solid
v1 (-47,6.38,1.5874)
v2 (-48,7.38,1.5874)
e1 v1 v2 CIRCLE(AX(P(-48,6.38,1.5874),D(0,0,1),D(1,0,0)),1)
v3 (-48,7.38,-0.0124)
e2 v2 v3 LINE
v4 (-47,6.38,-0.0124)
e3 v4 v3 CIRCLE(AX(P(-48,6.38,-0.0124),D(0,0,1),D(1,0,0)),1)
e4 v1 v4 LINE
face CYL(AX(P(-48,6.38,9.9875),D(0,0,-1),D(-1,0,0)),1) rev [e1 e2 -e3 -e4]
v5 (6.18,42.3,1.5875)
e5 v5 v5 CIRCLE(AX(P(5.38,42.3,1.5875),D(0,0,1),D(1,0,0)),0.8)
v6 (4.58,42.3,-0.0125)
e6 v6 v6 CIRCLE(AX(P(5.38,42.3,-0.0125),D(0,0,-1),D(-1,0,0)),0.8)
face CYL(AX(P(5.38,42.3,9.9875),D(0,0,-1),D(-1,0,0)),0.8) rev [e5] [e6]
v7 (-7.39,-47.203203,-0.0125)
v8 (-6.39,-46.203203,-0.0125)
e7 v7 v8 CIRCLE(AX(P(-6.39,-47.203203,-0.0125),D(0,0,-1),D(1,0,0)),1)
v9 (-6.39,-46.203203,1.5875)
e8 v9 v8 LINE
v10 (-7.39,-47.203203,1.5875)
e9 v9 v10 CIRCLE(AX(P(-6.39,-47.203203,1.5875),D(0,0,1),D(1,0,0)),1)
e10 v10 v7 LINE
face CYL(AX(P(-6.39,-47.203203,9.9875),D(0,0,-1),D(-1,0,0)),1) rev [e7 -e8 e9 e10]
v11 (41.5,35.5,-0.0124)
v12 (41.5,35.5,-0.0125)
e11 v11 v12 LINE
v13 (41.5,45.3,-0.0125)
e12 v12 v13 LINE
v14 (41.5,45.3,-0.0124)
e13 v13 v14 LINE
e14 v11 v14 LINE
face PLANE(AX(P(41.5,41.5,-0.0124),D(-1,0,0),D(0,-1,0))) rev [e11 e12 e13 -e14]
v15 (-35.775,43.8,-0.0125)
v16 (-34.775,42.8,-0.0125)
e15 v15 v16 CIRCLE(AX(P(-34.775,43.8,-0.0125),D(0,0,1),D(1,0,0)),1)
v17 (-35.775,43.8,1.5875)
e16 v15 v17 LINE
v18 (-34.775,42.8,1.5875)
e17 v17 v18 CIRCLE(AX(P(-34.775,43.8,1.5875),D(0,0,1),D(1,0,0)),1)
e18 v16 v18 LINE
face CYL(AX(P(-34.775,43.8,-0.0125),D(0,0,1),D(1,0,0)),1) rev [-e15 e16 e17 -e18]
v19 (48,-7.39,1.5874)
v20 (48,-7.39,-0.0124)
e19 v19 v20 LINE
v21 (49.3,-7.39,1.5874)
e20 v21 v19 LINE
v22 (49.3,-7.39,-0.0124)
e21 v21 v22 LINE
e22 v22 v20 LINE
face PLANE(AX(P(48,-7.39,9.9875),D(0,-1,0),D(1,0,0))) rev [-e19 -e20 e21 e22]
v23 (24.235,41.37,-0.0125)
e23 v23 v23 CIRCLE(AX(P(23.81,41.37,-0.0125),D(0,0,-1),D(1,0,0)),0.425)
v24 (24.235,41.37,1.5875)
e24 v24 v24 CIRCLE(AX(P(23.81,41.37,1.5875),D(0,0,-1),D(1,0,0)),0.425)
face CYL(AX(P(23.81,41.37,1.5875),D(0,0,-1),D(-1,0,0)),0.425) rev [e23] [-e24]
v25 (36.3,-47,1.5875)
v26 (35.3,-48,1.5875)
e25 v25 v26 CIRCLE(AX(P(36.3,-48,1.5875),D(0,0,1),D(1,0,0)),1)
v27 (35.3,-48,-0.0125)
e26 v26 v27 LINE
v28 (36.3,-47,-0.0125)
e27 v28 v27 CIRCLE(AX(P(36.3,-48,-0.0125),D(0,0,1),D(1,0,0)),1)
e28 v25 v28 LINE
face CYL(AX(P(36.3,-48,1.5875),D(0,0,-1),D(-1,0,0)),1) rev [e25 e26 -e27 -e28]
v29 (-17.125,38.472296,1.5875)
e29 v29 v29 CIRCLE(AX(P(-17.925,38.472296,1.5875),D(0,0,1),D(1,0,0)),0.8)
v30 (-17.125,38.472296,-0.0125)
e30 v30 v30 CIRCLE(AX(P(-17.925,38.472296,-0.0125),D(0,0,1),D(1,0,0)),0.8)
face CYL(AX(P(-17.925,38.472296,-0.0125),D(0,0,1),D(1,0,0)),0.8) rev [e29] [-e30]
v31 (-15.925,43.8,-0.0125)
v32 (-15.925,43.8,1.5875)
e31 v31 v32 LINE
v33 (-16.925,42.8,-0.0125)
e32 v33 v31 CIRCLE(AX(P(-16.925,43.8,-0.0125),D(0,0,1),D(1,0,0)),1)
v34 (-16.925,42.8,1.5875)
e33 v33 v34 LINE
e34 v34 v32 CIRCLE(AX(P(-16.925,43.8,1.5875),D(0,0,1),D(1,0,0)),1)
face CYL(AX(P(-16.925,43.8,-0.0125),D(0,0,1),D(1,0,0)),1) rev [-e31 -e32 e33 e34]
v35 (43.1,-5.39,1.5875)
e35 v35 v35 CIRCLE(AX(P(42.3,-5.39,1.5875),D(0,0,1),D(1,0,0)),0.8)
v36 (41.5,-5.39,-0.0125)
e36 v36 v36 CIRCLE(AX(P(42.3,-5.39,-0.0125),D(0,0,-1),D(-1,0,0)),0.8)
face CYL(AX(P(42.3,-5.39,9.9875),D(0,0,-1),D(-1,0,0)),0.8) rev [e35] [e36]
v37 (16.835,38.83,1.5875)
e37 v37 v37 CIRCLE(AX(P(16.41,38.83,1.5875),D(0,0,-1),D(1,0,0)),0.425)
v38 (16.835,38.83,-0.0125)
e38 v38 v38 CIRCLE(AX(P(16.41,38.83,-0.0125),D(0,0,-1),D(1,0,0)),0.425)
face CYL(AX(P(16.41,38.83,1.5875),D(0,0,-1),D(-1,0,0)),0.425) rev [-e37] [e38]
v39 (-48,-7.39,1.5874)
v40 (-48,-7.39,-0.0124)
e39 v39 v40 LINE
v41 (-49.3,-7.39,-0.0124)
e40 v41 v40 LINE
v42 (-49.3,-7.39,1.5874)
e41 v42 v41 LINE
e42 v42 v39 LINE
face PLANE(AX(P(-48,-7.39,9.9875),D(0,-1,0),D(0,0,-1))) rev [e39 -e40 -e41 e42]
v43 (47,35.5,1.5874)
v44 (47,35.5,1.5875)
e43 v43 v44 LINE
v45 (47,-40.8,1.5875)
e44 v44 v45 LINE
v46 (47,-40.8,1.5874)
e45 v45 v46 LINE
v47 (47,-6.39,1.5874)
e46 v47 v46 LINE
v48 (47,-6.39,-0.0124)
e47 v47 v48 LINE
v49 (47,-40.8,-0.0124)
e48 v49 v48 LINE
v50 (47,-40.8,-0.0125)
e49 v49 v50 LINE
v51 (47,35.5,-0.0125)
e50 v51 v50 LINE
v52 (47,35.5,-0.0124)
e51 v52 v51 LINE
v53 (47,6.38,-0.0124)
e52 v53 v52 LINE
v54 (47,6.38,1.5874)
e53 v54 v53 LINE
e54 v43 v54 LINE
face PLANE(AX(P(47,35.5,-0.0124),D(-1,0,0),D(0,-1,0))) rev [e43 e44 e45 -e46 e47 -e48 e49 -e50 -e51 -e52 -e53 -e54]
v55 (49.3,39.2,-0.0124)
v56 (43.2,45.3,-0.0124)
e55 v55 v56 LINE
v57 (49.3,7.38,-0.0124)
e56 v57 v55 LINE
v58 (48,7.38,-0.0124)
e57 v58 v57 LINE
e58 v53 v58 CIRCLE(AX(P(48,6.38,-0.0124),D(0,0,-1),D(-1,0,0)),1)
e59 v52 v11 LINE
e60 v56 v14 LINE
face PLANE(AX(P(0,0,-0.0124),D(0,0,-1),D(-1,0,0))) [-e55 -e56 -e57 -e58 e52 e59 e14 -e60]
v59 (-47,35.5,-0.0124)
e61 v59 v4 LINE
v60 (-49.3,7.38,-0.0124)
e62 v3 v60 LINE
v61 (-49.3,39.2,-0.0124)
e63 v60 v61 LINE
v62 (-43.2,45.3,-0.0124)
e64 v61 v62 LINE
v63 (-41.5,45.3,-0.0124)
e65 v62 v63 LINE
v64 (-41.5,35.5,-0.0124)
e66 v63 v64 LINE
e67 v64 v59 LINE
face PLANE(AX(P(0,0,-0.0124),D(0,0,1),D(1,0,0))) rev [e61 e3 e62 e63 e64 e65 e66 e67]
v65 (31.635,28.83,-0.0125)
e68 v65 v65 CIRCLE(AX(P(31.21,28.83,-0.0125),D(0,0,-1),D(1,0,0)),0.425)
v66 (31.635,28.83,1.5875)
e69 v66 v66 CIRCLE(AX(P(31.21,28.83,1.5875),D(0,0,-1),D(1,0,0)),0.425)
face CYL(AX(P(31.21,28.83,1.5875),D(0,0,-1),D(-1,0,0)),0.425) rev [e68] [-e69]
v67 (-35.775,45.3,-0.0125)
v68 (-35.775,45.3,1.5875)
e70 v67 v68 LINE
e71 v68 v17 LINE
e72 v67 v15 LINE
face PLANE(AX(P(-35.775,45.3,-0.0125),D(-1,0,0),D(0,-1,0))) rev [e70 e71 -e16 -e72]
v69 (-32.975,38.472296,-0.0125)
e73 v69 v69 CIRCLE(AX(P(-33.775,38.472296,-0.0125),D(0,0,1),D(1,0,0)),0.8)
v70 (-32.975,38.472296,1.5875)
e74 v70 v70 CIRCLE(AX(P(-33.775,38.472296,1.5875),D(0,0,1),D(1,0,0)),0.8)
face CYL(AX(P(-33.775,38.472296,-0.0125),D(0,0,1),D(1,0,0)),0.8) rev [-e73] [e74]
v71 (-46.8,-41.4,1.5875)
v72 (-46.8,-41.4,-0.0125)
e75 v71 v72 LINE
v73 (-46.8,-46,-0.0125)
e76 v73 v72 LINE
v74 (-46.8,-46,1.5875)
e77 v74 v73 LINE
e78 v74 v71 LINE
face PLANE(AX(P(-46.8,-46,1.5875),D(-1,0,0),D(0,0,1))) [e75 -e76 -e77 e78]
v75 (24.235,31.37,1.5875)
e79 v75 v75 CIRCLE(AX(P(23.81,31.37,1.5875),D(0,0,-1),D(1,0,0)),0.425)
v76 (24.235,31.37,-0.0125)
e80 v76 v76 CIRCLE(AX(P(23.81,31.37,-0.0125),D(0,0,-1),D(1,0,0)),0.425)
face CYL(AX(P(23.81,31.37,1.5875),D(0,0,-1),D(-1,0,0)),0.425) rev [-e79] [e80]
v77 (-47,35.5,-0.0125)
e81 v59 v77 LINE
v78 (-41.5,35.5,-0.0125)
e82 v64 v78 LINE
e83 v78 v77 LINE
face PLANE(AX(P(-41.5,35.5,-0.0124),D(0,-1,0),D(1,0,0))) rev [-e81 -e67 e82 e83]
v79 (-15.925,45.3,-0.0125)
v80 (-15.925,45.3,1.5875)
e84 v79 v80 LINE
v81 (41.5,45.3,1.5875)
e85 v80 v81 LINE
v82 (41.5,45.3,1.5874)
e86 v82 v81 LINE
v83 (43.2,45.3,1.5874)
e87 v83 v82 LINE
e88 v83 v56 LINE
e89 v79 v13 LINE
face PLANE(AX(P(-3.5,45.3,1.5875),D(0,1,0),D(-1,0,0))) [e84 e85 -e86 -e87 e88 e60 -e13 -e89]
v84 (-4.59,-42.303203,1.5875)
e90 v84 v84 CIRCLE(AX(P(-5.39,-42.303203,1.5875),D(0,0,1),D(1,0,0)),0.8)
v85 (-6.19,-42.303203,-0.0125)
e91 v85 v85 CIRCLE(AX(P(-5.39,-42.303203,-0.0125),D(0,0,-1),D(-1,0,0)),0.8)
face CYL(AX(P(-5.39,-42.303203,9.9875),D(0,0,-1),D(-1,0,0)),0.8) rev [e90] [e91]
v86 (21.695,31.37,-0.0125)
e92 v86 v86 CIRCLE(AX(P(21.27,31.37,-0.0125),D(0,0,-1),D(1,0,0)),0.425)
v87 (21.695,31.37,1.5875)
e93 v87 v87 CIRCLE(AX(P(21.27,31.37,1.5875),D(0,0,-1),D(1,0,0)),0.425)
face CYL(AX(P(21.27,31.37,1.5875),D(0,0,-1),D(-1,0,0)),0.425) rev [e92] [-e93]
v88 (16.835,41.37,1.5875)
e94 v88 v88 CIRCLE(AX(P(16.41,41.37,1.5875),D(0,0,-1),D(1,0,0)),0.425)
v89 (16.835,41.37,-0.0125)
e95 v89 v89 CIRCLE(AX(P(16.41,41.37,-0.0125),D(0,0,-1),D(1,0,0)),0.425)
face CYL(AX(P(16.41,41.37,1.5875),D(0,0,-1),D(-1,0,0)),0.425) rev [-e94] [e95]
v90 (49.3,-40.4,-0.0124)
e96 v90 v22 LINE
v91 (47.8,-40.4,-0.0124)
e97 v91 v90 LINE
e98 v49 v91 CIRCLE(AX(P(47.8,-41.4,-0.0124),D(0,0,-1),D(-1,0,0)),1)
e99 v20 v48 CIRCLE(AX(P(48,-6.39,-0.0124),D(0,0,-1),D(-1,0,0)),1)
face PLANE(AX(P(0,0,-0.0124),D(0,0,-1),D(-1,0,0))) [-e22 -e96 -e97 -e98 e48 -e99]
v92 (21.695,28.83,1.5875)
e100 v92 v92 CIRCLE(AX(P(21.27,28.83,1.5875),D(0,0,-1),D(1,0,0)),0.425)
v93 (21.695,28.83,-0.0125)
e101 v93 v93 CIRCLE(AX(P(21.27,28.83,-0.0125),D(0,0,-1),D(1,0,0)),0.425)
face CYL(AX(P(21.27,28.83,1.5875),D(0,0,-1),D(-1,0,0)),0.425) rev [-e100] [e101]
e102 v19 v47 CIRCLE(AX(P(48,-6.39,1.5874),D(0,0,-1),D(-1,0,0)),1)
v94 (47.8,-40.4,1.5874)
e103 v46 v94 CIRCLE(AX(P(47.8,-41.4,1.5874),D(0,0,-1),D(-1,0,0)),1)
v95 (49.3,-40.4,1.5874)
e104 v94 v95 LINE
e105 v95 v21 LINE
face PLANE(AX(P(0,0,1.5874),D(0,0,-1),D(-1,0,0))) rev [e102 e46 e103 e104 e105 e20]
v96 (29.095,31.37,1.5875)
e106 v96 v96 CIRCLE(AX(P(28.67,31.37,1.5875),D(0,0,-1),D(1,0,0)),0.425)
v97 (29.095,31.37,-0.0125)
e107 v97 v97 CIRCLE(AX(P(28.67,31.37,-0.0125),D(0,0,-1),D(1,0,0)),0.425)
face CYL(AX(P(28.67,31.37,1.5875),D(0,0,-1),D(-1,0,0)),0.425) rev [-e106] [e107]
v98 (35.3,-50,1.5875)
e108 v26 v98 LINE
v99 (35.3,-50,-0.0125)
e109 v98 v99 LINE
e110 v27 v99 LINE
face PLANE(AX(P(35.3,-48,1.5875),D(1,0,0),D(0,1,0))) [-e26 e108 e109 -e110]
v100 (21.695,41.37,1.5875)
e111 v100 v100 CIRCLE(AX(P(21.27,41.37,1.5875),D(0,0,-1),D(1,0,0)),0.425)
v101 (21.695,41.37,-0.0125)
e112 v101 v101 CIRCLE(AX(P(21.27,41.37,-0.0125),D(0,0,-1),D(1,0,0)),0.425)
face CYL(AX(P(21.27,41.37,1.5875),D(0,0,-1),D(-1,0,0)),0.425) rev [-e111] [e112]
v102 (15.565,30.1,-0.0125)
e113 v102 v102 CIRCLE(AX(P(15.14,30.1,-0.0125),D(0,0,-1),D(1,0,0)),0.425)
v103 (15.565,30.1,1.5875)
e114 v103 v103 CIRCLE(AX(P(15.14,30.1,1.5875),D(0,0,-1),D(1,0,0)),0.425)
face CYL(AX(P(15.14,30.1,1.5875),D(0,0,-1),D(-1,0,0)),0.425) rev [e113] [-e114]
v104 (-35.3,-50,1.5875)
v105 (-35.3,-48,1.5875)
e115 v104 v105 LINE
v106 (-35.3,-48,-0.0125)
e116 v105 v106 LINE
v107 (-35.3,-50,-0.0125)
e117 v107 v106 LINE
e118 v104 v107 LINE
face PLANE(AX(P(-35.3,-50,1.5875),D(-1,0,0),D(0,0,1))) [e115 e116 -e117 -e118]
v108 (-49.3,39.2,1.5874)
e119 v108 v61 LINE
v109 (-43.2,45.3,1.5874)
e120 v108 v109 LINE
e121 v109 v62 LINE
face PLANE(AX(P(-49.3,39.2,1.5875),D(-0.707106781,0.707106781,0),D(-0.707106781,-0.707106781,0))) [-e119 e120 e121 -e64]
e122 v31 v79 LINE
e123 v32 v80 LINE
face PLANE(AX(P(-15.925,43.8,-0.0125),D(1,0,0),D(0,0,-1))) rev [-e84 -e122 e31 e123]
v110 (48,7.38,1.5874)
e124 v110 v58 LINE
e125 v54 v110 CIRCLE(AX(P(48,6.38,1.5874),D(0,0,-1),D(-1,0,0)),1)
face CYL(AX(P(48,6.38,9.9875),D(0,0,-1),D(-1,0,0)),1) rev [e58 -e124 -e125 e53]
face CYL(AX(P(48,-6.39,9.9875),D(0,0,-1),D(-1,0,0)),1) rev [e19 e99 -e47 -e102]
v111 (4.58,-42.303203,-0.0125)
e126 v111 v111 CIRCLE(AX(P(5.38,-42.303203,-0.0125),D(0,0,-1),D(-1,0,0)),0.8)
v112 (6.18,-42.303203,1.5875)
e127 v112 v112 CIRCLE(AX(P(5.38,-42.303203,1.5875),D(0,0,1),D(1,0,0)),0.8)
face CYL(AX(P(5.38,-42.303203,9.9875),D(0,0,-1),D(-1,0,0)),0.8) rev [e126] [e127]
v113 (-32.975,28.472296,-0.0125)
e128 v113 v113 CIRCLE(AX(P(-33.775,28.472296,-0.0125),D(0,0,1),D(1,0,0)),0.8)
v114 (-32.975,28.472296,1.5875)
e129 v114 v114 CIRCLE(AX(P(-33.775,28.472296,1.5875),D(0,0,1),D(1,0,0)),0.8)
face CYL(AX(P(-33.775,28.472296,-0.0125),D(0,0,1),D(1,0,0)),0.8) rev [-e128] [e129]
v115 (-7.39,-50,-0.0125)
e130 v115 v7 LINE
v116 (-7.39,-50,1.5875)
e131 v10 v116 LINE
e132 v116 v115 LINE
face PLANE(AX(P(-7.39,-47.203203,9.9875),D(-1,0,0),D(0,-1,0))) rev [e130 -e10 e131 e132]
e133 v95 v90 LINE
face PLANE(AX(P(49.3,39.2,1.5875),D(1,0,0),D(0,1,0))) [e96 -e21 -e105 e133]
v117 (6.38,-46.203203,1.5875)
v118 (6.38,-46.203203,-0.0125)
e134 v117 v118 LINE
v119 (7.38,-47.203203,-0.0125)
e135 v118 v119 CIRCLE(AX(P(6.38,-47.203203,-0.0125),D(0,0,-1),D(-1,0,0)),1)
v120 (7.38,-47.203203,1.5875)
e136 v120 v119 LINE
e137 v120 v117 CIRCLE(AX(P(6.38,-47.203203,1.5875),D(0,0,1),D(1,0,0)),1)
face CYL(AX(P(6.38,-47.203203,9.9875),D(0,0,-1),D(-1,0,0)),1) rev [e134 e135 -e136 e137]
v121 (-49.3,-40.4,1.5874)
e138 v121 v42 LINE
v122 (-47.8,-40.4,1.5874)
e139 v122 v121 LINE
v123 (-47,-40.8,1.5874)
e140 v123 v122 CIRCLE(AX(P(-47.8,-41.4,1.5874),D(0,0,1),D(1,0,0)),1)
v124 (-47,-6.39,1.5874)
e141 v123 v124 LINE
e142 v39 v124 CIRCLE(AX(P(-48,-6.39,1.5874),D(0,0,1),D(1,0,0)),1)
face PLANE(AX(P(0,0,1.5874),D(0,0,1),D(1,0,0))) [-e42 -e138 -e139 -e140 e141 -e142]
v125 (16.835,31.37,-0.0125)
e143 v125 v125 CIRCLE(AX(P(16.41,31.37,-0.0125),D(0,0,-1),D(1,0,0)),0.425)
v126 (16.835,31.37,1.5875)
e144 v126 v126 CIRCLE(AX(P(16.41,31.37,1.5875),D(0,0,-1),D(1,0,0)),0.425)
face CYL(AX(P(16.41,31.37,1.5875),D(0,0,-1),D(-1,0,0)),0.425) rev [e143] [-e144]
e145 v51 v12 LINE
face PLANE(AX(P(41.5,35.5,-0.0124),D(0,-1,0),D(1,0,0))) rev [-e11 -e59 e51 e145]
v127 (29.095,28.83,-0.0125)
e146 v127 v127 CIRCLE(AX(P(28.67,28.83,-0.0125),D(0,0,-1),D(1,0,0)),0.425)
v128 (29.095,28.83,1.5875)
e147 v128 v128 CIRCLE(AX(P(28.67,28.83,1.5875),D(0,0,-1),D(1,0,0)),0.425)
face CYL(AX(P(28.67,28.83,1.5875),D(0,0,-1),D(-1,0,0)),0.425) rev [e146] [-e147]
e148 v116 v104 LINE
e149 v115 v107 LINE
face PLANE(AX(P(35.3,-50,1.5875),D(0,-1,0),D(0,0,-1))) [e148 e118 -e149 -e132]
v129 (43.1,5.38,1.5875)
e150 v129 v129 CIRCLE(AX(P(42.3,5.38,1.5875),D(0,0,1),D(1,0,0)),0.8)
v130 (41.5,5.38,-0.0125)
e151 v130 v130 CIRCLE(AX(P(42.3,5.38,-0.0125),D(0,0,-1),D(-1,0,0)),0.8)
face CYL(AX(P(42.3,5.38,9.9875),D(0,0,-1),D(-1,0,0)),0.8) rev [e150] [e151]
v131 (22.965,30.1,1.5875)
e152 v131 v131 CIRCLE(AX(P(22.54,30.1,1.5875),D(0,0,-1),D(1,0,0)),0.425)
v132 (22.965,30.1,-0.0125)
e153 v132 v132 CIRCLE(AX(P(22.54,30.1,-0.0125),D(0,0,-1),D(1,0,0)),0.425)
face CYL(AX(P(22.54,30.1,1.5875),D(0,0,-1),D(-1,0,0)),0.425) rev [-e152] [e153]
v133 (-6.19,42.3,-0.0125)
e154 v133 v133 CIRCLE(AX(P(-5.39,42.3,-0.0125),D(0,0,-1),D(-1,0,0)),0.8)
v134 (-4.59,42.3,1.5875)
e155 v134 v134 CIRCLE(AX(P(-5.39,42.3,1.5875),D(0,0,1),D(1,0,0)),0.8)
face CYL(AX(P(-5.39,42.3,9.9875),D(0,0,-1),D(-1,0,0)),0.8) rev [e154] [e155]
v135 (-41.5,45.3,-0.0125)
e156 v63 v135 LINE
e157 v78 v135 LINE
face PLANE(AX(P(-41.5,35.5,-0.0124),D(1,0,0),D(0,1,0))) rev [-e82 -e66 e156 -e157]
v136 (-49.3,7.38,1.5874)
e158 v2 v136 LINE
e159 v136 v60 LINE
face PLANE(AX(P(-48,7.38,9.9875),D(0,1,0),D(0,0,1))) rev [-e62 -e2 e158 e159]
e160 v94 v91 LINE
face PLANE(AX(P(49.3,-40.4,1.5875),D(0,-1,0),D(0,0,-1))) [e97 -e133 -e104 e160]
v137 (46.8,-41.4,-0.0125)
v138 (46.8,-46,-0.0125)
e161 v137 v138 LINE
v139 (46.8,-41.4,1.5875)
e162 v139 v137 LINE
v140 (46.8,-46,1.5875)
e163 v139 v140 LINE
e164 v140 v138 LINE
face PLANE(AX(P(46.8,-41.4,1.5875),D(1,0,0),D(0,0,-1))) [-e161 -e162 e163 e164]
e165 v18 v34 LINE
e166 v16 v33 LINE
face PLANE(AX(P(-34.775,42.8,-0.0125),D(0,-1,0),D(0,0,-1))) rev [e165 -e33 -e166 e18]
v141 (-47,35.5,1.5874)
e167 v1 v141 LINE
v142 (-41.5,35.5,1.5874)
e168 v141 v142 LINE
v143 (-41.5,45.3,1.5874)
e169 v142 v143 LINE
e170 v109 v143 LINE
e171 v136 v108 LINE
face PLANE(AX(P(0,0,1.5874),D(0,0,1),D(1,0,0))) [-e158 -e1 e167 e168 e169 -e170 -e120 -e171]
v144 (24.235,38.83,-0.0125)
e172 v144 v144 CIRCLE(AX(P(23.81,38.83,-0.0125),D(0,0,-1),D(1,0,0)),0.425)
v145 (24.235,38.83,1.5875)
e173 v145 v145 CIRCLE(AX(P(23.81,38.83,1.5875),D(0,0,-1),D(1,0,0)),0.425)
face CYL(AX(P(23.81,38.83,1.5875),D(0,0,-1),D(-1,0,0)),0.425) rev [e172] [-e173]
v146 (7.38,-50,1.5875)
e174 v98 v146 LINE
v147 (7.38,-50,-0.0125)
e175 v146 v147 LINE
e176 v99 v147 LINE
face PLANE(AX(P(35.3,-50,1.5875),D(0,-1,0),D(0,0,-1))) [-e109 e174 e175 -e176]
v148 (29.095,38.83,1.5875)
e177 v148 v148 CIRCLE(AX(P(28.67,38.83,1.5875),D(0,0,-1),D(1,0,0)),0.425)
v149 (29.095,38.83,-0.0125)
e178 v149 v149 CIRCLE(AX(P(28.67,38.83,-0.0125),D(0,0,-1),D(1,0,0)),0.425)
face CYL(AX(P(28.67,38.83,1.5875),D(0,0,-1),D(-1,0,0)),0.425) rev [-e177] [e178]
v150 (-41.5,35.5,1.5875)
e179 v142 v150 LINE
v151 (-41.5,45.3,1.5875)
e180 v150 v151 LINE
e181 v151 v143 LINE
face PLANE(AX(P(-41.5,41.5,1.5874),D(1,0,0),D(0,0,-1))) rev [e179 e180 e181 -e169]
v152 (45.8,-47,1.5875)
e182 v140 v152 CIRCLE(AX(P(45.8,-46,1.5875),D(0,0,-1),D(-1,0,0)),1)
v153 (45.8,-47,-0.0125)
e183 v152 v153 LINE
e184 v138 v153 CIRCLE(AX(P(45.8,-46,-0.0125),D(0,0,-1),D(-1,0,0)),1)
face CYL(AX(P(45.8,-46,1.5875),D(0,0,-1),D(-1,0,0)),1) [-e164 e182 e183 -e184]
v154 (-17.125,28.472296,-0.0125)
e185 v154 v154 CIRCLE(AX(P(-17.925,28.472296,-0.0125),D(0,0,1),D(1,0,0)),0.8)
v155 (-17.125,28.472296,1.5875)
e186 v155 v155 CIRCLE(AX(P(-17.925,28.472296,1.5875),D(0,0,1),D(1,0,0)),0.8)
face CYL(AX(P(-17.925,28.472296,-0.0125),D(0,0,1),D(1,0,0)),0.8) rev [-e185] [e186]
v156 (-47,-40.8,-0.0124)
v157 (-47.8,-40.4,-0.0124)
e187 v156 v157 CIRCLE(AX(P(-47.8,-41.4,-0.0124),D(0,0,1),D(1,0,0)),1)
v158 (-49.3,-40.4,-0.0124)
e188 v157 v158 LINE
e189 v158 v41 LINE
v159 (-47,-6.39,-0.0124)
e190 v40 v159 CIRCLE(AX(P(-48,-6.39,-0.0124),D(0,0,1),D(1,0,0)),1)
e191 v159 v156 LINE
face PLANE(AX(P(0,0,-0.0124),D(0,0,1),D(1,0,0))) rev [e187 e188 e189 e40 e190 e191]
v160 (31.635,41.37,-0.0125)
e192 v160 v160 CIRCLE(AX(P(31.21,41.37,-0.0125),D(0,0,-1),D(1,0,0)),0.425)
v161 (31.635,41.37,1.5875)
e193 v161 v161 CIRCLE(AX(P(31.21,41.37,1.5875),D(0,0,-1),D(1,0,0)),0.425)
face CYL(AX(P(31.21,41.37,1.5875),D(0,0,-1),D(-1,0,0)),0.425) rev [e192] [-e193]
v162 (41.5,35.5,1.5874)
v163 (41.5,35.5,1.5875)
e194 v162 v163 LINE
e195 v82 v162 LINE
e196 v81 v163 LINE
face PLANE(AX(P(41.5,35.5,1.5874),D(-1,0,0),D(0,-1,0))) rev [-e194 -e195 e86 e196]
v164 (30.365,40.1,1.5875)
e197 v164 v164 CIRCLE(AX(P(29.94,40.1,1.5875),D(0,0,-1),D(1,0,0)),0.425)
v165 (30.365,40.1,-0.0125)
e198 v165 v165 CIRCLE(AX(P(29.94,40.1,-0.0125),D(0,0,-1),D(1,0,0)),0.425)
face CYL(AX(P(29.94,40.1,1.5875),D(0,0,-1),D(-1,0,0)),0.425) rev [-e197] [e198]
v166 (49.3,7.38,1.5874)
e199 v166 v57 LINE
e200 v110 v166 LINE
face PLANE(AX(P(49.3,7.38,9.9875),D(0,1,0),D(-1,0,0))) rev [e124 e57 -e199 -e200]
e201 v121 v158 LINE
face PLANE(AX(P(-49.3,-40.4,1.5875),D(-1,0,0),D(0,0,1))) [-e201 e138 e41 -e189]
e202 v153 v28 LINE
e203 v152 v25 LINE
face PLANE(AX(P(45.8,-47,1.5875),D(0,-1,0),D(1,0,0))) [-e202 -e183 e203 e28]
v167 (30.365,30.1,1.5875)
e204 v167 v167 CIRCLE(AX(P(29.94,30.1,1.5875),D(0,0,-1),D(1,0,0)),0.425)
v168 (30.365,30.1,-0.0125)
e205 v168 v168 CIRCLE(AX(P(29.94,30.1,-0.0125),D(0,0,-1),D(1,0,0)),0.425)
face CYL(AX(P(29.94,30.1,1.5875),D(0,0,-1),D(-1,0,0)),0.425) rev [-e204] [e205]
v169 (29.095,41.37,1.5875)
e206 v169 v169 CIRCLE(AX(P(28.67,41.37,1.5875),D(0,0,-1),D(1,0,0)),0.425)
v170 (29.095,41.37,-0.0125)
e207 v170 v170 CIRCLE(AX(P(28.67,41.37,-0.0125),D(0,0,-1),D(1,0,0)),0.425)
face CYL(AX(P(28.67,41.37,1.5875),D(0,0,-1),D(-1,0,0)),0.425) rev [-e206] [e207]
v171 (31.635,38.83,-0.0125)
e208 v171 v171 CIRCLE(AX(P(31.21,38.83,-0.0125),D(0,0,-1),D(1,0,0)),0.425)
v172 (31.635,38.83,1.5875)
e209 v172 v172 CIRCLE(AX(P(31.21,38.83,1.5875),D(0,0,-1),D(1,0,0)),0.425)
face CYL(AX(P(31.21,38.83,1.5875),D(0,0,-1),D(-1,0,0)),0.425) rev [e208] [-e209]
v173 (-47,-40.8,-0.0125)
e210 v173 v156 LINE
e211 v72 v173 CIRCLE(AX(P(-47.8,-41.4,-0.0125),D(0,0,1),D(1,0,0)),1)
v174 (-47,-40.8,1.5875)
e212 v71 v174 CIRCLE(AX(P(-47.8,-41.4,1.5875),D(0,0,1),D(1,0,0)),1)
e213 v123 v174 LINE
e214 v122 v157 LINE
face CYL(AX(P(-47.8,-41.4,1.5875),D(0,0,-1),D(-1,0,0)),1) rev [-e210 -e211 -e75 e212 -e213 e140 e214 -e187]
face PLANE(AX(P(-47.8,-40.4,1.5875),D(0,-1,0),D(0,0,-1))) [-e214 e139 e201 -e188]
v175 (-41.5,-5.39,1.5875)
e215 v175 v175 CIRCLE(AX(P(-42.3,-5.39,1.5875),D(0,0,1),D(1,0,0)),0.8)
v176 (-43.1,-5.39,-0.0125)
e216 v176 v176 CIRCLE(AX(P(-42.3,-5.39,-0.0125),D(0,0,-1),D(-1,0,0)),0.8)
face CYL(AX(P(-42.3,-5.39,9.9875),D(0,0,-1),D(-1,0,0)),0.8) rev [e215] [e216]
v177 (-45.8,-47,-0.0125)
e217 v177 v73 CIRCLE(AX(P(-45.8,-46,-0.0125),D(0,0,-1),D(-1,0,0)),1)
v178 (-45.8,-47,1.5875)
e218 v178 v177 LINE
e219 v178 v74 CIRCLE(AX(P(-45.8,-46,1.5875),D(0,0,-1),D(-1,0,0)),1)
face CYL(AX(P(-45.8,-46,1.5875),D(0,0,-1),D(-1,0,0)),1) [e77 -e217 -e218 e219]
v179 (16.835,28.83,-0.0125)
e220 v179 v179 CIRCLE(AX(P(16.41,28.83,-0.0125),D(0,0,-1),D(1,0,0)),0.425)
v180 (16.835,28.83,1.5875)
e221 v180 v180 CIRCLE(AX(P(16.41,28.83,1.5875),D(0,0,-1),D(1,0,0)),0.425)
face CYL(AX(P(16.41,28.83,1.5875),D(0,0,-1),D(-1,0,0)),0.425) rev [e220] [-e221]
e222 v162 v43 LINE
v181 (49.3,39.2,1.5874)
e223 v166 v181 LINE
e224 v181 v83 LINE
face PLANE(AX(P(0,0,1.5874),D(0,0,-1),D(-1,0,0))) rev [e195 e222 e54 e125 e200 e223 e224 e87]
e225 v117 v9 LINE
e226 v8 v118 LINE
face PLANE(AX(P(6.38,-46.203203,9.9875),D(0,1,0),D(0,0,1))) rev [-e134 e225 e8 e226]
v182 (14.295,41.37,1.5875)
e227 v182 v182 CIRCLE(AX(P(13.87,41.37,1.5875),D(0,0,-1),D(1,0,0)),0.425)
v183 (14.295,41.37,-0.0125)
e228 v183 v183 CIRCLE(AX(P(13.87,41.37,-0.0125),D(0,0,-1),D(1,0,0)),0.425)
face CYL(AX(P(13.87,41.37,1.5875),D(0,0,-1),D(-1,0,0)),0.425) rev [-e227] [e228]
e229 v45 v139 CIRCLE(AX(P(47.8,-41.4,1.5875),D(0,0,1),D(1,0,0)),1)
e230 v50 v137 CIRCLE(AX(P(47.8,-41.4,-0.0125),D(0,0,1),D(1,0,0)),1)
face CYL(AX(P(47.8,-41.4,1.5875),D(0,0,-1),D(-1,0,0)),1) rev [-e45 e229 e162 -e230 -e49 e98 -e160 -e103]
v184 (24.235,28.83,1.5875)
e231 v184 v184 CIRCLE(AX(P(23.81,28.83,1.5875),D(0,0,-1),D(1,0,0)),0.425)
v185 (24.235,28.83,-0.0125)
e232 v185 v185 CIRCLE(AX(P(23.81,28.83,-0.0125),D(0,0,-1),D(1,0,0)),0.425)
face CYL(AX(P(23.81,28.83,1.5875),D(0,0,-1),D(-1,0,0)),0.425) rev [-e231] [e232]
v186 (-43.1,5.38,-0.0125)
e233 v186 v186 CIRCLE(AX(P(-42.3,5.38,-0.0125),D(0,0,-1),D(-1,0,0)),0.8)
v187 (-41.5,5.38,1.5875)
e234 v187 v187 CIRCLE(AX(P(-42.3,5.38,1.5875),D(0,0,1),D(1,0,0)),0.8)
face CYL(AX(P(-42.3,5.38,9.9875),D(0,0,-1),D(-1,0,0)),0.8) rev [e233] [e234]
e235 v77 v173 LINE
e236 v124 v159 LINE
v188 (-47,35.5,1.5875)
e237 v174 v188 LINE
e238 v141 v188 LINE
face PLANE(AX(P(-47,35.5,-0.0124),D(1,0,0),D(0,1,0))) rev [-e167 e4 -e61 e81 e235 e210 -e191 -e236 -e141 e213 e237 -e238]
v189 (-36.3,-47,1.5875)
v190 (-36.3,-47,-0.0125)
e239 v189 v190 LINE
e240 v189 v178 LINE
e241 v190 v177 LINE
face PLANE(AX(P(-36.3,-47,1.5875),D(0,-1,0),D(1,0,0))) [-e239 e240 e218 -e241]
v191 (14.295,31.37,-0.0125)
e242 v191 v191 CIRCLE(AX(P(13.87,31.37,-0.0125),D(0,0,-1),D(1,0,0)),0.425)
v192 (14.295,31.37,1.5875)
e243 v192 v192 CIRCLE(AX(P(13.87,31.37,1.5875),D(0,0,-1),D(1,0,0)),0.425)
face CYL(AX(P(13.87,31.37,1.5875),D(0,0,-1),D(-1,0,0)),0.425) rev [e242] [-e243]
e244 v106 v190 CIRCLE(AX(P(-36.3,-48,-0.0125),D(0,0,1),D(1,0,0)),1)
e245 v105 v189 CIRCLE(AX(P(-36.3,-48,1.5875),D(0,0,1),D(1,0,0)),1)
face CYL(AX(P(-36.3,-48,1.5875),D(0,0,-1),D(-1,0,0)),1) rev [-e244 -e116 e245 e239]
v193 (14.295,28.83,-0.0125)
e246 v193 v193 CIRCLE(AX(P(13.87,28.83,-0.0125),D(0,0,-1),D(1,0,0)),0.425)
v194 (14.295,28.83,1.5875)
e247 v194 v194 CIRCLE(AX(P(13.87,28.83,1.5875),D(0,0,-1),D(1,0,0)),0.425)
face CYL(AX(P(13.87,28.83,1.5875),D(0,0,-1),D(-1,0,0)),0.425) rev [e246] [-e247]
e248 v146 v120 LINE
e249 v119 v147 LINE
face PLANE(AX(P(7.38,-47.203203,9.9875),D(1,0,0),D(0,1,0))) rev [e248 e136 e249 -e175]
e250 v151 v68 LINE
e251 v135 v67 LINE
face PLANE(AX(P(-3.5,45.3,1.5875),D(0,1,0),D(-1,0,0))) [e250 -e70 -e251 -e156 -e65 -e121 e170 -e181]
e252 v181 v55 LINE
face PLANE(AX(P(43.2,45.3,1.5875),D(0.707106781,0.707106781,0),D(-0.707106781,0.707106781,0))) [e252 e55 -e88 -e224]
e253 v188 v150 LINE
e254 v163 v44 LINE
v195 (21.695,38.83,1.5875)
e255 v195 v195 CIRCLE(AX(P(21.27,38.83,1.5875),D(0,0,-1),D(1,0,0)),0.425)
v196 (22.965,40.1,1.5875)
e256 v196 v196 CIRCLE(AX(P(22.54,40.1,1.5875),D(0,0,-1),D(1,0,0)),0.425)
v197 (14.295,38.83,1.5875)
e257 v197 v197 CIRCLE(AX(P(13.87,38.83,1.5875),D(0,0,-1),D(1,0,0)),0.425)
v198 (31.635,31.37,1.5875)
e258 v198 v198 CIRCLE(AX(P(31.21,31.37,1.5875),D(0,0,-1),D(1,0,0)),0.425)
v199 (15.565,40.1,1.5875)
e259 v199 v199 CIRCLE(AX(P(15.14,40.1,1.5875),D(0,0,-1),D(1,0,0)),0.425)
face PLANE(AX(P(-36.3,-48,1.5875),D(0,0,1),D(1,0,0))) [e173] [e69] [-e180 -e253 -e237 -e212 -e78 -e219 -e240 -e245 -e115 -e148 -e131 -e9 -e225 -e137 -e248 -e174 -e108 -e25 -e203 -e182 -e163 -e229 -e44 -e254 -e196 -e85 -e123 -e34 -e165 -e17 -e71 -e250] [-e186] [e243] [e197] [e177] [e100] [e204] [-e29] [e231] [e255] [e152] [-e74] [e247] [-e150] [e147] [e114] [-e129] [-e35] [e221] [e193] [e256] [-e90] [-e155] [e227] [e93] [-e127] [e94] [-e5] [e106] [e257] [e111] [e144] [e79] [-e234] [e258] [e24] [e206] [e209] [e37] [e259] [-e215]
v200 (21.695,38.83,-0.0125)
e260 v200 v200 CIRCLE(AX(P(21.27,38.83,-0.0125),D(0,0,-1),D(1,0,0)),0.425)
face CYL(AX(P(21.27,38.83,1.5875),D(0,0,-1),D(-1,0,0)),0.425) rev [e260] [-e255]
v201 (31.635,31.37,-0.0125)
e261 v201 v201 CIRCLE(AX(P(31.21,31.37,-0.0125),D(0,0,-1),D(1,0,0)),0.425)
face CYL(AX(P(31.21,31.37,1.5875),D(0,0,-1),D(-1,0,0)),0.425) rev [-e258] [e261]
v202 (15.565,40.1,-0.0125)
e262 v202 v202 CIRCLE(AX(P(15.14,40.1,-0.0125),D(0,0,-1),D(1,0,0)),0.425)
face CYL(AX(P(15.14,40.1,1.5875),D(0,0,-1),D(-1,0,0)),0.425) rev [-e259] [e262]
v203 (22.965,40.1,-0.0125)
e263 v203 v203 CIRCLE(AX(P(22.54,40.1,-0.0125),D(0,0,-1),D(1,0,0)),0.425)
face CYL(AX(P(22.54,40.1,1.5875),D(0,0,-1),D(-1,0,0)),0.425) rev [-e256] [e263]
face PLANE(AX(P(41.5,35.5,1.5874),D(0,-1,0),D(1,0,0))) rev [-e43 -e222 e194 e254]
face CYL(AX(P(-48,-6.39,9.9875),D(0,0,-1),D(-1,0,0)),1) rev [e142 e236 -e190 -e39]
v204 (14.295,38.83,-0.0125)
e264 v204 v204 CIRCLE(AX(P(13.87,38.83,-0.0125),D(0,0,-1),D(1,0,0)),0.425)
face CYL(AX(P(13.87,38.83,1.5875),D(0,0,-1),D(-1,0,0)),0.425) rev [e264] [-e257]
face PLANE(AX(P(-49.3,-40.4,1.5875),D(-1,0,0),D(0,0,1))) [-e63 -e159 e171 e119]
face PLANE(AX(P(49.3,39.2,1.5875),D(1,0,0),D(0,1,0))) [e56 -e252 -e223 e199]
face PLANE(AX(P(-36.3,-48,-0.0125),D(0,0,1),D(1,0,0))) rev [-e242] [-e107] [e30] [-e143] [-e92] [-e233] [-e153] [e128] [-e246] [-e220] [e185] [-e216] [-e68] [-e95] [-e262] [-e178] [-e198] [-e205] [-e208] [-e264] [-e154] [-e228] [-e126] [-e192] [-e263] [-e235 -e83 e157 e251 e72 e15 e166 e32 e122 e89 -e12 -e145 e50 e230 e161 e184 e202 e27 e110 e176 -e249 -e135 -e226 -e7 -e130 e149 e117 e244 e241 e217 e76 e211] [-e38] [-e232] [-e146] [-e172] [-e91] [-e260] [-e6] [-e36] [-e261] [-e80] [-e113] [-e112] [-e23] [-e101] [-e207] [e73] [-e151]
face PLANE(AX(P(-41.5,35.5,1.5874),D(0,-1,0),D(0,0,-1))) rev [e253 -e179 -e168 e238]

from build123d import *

# Parameters (mm, degrees)
SKETCH1_R                = 0.425
BOSS_EXTRUDE1_DEPTH      = 1.6
LPATTERN2_START          = -0.0125
LPATTERN2_OUTLINE_R      = 0.425
LPATTERN2_DEPTH          = 1.6
SLOTFOOTPRINTS_REF_DEPTH = 0.0001
SLOTFOOTPRINTS_DEPTH     = 0.0001
SKETCH2_R                = 0.8
F_20PIN_MOUNTS_DEPTH     = 71.235674696
SKETCH3_R                = 0.8
F_12PIN_MOUNTS_DEPTH     = 10


# Read off the part's stored shape, not the designer's step: LPattern2
with BuildPart() as part:
    # Sketch1 → Boss-Extrude1 (new body)
    with BuildSketch(Plane(origin=(0, 0, -0.0125), x_dir=(-1, 0, 0), z_dir=(0, 0, -1))):
        with BuildLine():
            Line((35.3, -50), (35.3, -48))
            ThreePointArc((35.3, -48), (35.592893219, -47.292893219), (36.3, -47))
            Line((36.3, -47), (45.8, -47))
            ThreePointArc((45.8, -47), (46.507106781, -46.707106781), (46.8, -46))
            Line((46.8, -46), (46.8, -41.4))
            ThreePointArc((46.8, -41.4), (47.092893219, -40.692893219), (47.8, -40.4))
            Line((47.8, -40.4), (49.3, -40.4))
            Line((49.3, -40.4), (49.3, 39.2))
            Line((49.3, 39.2), (43.2, 45.3))
            Line((43.2, 45.3), (35.500000002, 45.3))
            Line((35.500000002, 45.3), (3.499999998, 45.3))
            Line((3.499999998, 45.3), (-43.2, 45.3))
            Line((-43.2, 45.3), (-49.3, 39.2))
            Line((-49.3, 39.2), (-49.3, -40.4))
            Line((-49.3, -40.4), (-47.8, -40.4))
            ThreePointArc((-47.8, -40.4), (-47.092893219, -40.692893219), (-46.8, -41.4))
            Line((-46.8, -41.4), (-46.8, -46))
            ThreePointArc((-46.8, -46), (-46.507106781, -46.707106781), (-45.8, -47))
            Line((-45.8, -47), (-36.3, -47))
            ThreePointArc((-36.3, -47), (-35.592893219, -47.292893219), (-35.3, -48))
            Line((-35.3, -48), (-35.3, -50))
            Line((-35.3, -50), (35.3, -50))
        make_face()
        with Locations(Location((-21.27, 41.37, 0), (0, 0, 180))):
            Circle(SKETCH1_R, mode=Mode.SUBTRACT)
        with Locations(Location((-23.81, 41.37, 0), (0, 0, 180))):
            Circle(SKETCH1_R, mode=Mode.SUBTRACT)
        with Locations(Location((-22.54, 40.1, 0), (0, 0, 180))):
            Circle(SKETCH1_R, mode=Mode.SUBTRACT)
        with Locations(Location((-13.87, 41.37, 0), (0, 0, 180))):
            Circle(SKETCH1_R, mode=Mode.SUBTRACT)
        with Locations(Location((-23.81, 38.83, 0), (0, 0, 180))):
            Circle(SKETCH1_R, mode=Mode.SUBTRACT)
        with Locations(Location((-16.41, 41.37, 0), (0, 0, 180))):
            Circle(SKETCH1_R, mode=Mode.SUBTRACT)
        with Locations(Location((-15.14, 40.1, 0), (0, 0, 180))):
            Circle(SKETCH1_R, mode=Mode.SUBTRACT)
        with Locations(Location((-21.27, 38.83, 0), (0, 0, 180))):
            Circle(SKETCH1_R, mode=Mode.SUBTRACT)
        with Locations(Location((-28.67, 41.37, 0), (0, 0, 180))):
            Circle(SKETCH1_R, mode=Mode.SUBTRACT)
        with Locations(Location((-31.21, 41.37, 0), (0, 0, 180))):
            Circle(SKETCH1_R, mode=Mode.SUBTRACT)
        with Locations(Location((-16.41, 38.83, 0), (0, 0, 180))):
            Circle(SKETCH1_R, mode=Mode.SUBTRACT)
        with Locations(Location((-29.94, 40.1, 0), (0, 0, 180))):
            Circle(SKETCH1_R, mode=Mode.SUBTRACT)
        with Locations(Location((-31.21, 38.83, 0), (0, 0, 180))):
            Circle(SKETCH1_R, mode=Mode.SUBTRACT)
        with Locations(Location((-28.67, 38.83, 0), (0, 0, 180))):
            Circle(SKETCH1_R, mode=Mode.SUBTRACT)
        with Locations(Location((-13.87, 38.83, 0), (0, 0, 180))):
            Circle(SKETCH1_R, mode=Mode.SUBTRACT)
    extrude(amount=-BOSS_EXTRUDE1_DEPTH)

    # LPattern2 outline → LPattern2 (cut)
    with BuildSketch(Plane.XY.offset(LPATTERN2_START)):
        with Locations((31.21, 31.37)):
            Circle(LPATTERN2_OUTLINE_R)
        with Locations((31.21, 28.83)):
            Circle(LPATTERN2_OUTLINE_R)
        with Locations((29.94, 30.1)):
            Circle(LPATTERN2_OUTLINE_R)
        with Locations((28.67, 28.83)):
            Circle(LPATTERN2_OUTLINE_R)
        with Locations((28.67, 31.37)):
            Circle(LPATTERN2_OUTLINE_R)
        with Locations((16.41, 31.37)):
            Circle(LPATTERN2_OUTLINE_R)
        with Locations((23.81, 31.37)):
            Circle(LPATTERN2_OUTLINE_R)
        with Locations((23.81, 28.83)):
            Circle(LPATTERN2_OUTLINE_R)
        with Locations((22.54, 30.1)):
            Circle(LPATTERN2_OUTLINE_R)
        with Locations((21.27, 28.83)):
            Circle(LPATTERN2_OUTLINE_R)
        with Locations((21.27, 31.37)):
            Circle(LPATTERN2_OUTLINE_R)
        with Locations((16.41, 28.83)):
            Circle(LPATTERN2_OUTLINE_R)
        with Locations((15.14, 30.1)):
            Circle(LPATTERN2_OUTLINE_R)
        with Locations((13.87, 28.83)):
            Circle(LPATTERN2_OUTLINE_R)
        with Locations((13.87, 31.37)):
            Circle(LPATTERN2_OUTLINE_R)
    extrude(amount=LPATTERN2_DEPTH, mode=Mode.SUBTRACT)

    # thermalContacts_lower → slotFootprints_REF (cut)
    with BuildSketch(Plane(origin=(0, 0, -0.0125), x_dir=(-1, 0, 0), z_dir=(0, 0, -1))):
        Polygon((47, 35.5), (47, -41.5), (59.827263463, -41.5), (59.827263463, 47), (41.5, 47), (41.5, 41.5), (41.5, 35.5), align=None)
        Polygon((-47, 35.5), (-47, -41.5), (-56.192158269, -41.5), (-56.192158269, 47), (-41.5, 47), (-41.5, 41.5), (-41.5, 35.5), align=None)
    extrude(amount=-SLOTFOOTPRINTS_REF_DEPTH, mode=Mode.SUBTRACT)

    # thermalContacts_upper → slotFootprints (cut)
    with BuildSketch(Plane.XY.offset(1.5875)):
        Polygon((-47, 35.5), (-47, -41.5), (-56.192158269, -41.5), (-56.192158269, 47), (-41.5, 47), (-41.5, 41.5), (-41.5, 35.5), align=None)
        Polygon((47, 35.5), (47, -41.5), (59.827263463, -41.5), (59.827263463, 47), (41.5, 47), (41.5, 41.5), (41.5, 35.5), align=None)
    extrude(amount=-SLOTFOOTPRINTS_DEPTH, mode=Mode.SUBTRACT)

    # Sketch2 → 20pin_mounts (cut, through all)
    with BuildSketch(Plane.XY.offset(1.5875)):
        with Locations((-33.775, 38.472296419)):
            Circle(SKETCH2_R)
        with Locations((-17.925, 38.472296419)):
            Circle(SKETCH2_R)
        with Locations((-17.925, 28.472296419)):
            Circle(SKETCH2_R)
        with Locations((-33.775, 28.472296419)):
            Circle(SKETCH2_R)
        with BuildLine():
            Line((-35.775, 45.3), (-35.775, 43.8))
            ThreePointArc((-35.775, 43.8), (-35.482106781, 43.092893219), (-34.775, 42.8))
            Line((-34.775, 42.8), (-16.925, 42.8))
            ThreePointArc((-16.925, 42.8), (-16.217893218, 43.092893219), (-15.925, 43.8))
            Line((-15.925, 43.8), (-15.925, 45.3))
            Line((-15.925, 45.3), (-35.775, 45.3))
        make_face()
    extrude(amount=-F_20PIN_MOUNTS_DEPTH, mode=Mode.SUBTRACT)

    # Sketch3 → 12pin_mounts (cut)
    with BuildSketch(Plane(origin=(0, 0, -0.0125), x_dir=(-1, 0, 0), z_dir=(0, 0, -1))):
        with Locations((5.390000006, 42.3)):
            Circle(SKETCH3_R)
        with Locations((-5.379999994, 42.3)):
            Circle(SKETCH3_R)
        with Locations((42.3, 5.379999994)):
            Circle(SKETCH3_R)
        with Locations((42.3, -5.390000006)):
            Circle(SKETCH3_R)
        with Locations((5.390000006, -42.303202712)):
            Circle(SKETCH3_R)
        with Locations((-5.379999994, -42.303202712)):
            Circle(SKETCH3_R)
        with Locations((-42.3, -5.390000006)):
            Circle(SKETCH3_R)
        with Locations((-42.3, 5.379999994)):
            Circle(SKETCH3_R)
        with BuildLine():
            Line((-49.3, 7.379999994), (-48, 7.379999994))
            ThreePointArc((-48, 7.379999994), (-47.292893219, 7.087106775), (-47, 6.379999994))
            Line((-47, 6.379999994), (-47, -6.390000006))
            ThreePointArc((-47, -6.390000006), (-47.292893219, -7.097106787), (-48, -7.390000006))
            Line((-48, -7.390000006), (-49.3, -7.390000006))
            Line((-49.3, -7.390000006), (-49.3, 7.379999994))
        make_face()
        with BuildLine():
            Line((48, 7.379999994), (49.3, 7.379999994))
            Line((49.3, 7.379999994), (49.3, -7.390000006))
            Line((49.3, -7.390000006), (48, -7.390000006))
            ThreePointArc((48, -7.390000006), (47.292893219, -7.097106787), (47, -6.390000006))
            Line((47, -6.390000006), (47, 6.379999994))
            ThreePointArc((47, 6.379999994), (47.292893219, 7.087106775), (48, 7.379999994))
        make_face()
        with BuildLine():
            Line((-6.379999994, -46.203202712), (6.390000006, -46.203202712))
            ThreePointArc((6.390000006, -46.203202712), (7.097106787, -46.496095931), (7.390000006, -47.203202712))
            Line((7.390000006, -47.203202712), (7.390000006, -50))
            Line((7.390000006, -50), (-7.379999994, -50))
            Line((-7.379999994, -50), (-7.379999994, -47.203202712))
            ThreePointArc((-7.379999994, -47.203202712), (-7.087106775, -46.496095931), (-6.379999994, -46.203202712))
        make_face()
    extrude(amount=-F_12PIN_MOUNTS_DEPTH, mode=Mode.SUBTRACT)


solid = part.part
